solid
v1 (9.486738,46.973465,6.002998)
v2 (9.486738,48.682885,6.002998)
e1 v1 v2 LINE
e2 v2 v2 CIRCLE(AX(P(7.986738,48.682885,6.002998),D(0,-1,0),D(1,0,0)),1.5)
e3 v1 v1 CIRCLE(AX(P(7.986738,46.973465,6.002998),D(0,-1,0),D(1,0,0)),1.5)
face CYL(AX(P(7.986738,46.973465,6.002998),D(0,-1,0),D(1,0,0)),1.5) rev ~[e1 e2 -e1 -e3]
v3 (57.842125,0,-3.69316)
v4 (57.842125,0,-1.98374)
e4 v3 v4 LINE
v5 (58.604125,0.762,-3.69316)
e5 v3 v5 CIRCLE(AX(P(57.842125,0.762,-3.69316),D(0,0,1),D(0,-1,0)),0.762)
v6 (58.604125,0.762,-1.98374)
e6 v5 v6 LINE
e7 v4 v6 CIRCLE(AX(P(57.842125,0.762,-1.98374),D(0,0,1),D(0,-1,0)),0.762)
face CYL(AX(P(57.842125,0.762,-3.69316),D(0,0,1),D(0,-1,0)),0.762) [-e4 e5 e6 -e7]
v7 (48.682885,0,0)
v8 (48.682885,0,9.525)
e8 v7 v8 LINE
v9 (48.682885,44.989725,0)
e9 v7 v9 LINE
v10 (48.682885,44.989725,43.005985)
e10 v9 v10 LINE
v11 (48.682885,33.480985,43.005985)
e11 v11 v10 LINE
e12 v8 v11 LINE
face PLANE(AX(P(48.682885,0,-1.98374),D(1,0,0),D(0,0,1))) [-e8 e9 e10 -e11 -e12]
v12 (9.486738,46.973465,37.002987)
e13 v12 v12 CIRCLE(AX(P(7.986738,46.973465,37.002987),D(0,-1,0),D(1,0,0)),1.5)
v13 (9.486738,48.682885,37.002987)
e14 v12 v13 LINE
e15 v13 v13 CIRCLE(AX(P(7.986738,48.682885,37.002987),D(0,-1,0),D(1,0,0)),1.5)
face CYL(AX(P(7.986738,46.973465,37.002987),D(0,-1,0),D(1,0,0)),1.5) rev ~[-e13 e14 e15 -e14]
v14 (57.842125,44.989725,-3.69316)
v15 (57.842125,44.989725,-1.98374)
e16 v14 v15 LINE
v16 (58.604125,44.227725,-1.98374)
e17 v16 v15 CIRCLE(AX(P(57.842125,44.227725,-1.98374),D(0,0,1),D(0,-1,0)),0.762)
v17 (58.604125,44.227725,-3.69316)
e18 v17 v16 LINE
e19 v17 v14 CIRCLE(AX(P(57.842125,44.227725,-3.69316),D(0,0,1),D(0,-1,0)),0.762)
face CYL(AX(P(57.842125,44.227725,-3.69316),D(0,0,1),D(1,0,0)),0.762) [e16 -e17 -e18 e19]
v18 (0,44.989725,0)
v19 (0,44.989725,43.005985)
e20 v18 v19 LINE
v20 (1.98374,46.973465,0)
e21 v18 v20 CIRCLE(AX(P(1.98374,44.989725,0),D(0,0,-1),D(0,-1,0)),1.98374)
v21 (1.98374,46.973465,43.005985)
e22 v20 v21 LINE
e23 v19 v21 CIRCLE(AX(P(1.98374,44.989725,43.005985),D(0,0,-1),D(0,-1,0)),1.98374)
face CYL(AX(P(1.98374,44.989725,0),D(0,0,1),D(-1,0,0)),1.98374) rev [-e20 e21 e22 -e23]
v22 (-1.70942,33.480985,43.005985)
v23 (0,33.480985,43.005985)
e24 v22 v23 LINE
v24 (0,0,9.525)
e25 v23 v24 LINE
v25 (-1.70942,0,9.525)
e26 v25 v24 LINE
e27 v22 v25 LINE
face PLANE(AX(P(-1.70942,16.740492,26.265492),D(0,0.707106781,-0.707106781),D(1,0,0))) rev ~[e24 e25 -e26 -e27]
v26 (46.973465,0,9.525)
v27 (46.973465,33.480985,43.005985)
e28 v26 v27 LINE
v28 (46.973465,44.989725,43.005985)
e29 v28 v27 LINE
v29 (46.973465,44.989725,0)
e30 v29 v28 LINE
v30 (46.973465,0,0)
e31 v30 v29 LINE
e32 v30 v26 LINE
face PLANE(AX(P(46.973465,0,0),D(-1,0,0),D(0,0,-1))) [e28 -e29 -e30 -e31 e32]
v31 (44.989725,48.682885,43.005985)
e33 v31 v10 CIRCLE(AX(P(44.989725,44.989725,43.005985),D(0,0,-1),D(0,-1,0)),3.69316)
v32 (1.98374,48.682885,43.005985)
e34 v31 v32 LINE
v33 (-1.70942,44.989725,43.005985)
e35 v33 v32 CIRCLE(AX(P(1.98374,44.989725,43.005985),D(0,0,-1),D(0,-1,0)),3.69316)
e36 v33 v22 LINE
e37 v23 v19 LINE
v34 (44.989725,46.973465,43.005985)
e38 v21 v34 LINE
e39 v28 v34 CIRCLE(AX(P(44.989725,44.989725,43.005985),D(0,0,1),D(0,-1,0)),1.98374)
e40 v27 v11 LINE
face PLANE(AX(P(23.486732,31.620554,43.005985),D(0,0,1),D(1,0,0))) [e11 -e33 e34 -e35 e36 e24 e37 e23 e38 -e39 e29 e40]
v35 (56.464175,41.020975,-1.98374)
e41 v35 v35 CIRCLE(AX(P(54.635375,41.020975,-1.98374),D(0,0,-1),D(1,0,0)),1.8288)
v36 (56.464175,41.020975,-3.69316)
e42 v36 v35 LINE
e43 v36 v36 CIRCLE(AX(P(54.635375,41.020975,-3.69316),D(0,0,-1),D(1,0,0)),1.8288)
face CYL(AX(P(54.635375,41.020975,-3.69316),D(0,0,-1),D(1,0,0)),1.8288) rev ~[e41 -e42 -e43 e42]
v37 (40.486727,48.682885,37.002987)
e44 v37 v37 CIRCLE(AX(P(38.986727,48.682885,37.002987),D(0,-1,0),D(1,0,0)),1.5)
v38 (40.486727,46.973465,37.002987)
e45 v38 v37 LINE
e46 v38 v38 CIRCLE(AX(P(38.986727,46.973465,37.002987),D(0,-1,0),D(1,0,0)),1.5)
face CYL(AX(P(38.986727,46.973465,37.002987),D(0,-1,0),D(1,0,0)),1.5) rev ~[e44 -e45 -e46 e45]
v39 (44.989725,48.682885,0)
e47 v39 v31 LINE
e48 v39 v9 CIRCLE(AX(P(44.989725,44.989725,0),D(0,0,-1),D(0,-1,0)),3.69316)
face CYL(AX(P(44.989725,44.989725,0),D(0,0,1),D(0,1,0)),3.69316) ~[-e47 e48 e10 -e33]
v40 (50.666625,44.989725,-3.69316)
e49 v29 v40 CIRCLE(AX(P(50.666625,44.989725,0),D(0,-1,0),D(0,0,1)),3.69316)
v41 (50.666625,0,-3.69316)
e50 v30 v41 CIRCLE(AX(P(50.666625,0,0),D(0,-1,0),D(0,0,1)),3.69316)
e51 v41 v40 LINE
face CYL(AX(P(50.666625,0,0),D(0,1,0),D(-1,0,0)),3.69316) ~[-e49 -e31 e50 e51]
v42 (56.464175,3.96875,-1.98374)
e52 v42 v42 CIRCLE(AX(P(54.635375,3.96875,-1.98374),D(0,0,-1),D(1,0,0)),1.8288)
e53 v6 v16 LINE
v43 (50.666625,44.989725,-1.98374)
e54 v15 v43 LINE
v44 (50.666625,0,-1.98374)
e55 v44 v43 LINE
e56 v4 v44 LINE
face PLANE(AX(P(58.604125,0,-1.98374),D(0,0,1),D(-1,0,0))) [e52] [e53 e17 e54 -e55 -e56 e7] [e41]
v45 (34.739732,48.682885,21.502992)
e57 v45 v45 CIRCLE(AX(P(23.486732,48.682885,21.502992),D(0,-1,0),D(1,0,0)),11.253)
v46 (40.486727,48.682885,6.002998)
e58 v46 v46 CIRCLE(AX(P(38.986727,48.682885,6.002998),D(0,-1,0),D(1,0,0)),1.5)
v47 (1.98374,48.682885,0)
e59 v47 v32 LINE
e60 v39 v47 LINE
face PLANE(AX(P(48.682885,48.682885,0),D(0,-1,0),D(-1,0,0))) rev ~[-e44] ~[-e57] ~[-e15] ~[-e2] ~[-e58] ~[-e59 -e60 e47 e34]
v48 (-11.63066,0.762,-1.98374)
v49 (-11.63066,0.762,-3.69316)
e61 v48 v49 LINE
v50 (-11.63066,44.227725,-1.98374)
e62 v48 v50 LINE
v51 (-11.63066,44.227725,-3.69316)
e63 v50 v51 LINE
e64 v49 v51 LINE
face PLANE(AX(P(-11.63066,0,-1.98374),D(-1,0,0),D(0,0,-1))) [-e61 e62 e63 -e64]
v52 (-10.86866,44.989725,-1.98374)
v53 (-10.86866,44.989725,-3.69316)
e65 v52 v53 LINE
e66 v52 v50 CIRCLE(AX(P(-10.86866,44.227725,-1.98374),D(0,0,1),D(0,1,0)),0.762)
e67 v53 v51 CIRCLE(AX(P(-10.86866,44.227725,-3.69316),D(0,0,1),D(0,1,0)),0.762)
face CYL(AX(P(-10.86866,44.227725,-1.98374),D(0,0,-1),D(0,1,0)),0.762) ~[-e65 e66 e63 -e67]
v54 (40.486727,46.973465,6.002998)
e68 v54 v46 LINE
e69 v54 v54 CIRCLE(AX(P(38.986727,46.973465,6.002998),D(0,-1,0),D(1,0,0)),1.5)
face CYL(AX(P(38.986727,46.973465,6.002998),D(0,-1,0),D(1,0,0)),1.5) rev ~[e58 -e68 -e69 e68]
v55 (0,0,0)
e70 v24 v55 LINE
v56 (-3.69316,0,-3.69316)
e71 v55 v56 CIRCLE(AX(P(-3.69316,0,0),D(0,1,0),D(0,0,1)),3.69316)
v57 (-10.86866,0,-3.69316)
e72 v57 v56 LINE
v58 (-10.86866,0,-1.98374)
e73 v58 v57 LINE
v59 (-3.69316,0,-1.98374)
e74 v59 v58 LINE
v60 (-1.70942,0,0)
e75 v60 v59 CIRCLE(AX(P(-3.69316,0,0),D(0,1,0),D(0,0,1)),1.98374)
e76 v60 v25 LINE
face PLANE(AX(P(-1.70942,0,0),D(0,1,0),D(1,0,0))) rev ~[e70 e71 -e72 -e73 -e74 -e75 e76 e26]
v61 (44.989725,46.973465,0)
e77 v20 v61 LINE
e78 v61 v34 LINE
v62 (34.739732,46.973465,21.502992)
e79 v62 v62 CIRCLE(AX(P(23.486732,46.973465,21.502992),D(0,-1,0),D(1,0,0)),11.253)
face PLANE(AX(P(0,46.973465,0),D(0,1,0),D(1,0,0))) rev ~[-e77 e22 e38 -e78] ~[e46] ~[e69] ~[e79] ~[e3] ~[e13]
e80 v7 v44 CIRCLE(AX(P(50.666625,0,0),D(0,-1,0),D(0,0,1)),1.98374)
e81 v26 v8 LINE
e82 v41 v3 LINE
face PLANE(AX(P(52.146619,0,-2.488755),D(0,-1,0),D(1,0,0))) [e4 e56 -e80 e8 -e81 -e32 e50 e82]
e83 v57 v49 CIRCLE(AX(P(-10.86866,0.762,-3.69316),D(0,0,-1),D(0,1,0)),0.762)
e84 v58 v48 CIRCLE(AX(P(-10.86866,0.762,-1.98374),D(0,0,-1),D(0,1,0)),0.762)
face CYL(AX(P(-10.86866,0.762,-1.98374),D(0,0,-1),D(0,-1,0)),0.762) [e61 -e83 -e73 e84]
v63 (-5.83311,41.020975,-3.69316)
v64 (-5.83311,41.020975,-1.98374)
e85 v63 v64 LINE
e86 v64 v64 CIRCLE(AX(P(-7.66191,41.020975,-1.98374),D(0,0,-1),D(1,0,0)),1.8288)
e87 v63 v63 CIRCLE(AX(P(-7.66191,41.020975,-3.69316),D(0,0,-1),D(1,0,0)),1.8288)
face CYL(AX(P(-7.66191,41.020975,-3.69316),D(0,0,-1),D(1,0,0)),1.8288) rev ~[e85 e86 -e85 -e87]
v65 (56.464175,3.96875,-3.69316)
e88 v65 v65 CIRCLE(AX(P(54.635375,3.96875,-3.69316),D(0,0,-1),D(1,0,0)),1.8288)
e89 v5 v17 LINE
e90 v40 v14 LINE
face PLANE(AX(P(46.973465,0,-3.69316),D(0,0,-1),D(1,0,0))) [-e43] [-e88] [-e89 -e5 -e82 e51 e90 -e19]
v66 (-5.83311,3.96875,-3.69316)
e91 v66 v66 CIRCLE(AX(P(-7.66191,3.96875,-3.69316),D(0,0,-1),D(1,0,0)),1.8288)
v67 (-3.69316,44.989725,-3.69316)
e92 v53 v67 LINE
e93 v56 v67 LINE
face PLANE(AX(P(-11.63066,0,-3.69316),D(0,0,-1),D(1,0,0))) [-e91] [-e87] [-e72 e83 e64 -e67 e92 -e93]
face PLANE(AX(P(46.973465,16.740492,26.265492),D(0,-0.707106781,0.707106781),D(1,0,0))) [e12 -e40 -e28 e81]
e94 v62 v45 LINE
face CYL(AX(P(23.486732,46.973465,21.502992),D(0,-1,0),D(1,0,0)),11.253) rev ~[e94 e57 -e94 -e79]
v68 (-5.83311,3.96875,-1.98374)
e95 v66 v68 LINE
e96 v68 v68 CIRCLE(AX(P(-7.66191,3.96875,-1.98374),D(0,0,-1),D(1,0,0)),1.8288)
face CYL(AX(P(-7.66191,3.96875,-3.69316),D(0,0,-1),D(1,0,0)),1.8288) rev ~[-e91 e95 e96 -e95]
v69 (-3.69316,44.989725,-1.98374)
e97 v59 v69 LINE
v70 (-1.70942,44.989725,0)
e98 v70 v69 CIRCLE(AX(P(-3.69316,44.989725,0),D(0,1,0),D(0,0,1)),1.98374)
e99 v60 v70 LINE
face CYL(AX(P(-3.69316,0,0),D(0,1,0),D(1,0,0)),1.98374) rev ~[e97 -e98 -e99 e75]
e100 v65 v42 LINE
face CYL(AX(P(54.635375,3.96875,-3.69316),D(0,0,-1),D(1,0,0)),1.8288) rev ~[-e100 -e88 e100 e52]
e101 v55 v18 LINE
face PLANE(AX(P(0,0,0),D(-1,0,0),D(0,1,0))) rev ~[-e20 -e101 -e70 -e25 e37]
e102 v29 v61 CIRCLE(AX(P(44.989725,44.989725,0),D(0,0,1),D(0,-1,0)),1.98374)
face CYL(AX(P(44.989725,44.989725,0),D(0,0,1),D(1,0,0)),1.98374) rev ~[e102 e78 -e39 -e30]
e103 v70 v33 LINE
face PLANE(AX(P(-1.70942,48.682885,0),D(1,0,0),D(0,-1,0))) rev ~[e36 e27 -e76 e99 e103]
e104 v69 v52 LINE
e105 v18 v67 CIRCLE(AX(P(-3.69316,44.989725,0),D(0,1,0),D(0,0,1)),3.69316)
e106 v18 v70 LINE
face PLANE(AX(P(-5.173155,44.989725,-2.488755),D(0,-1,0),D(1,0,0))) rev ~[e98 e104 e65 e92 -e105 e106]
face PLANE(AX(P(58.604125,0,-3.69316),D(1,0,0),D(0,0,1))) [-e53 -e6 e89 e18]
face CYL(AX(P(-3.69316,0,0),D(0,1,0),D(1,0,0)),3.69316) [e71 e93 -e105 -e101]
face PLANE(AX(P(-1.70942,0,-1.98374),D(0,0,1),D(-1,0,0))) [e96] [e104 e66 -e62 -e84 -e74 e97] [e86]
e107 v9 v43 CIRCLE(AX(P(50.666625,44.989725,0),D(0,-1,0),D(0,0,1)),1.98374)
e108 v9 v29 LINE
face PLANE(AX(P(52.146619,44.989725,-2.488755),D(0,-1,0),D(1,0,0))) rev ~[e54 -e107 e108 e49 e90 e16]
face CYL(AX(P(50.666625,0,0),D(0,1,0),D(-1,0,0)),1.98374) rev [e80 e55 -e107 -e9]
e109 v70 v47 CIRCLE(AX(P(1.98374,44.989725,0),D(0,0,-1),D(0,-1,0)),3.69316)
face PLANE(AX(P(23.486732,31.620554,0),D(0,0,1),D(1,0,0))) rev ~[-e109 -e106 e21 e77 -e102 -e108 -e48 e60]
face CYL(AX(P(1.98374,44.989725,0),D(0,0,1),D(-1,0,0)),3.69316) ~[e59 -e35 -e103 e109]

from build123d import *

# Parameters (mm, degrees)
F1_DEPTH  = 43.0059846
F4_DEPTH  = 44.9897246
F5_R      = 1.98374
F6_R      = 3.69316
F7_SIZE   = 33.4809846
F8_R      = 11.2530001
F8_R_2    = 1.5
F9_DEPTH  = 1.70942
F10_R     = 1.8288
F11_DEPTH = 1.70942
F12_R     = 0.762


with BuildPart() as f1:
    # F0 (on Top) → F1 (new body)
    with BuildSketch(Plane.XY):
        Polygon((-1.70942, 0), (0, 0), (0, 46.9734646), (46.9734646, 46.9734646), (46.9734646, 0), (48.6828846, 0), (48.6828846, 48.6828846), (-1.70942, 48.6828846), align=None)
    extrude(amount=F1_DEPTH)

    # F3 (on face) → F4 (join, through all)
    with BuildSketch(Plane.XZ):
        Polygon((48.6828846, 0), (46.9734646, 0), (46.9734646, -3.69316), (58.6041246, -3.69316), (58.6041246, -1.98374), (48.6828846, -1.98374), align=None)
        Polygon((0, 0), (-1.70942, 0), (-1.70942, -1.98374), (-11.63066, -1.98374), (-11.63066, -3.69316), (0, -3.69316), align=None)
    extrude(amount=-F4_DEPTH)

    # F5
    f5_edges = [f1.edges().sort_by_distance(p)[0] for p in [
        (0, 46.973465, 21.502992),
        (46.973465, 46.973465, 21.502992),
        (-1.70942, 22.494862, -1.98374),
        (48.682885, 22.494862, -1.98374),
    ]]
    fillet(f5_edges, radius=F5_R)

    # F6
    f6_edges = [f1.edges().sort_by_distance(p)[0] for p in [
        (48.682885, 48.682885, 21.502992),
        (-1.70942, 48.682885, 21.502992),
        (0, 22.494862, -3.69316),
        (46.973465, 22.494862, -3.69316),
    ]]
    fillet(f6_edges, radius=F6_R)

    # F7
    f7_edges = [f1.edges().sort_by_distance(p)[0] for p in [
        (-0.85471, 0, 43.005985),
        (47.828175, 0, 43.005985),
    ]]
    chamfer(f7_edges, length=F7_SIZE)

    # F8 (on face) → F9 (cut, through all)
    with BuildSketch(Plane.XZ.offset(-46.9734646)):
        with Locations((23.4867323, 21.5029923)):
            Circle(F8_R)
        with Locations((38.9867267, 37.0029867)):
            Circle(F8_R_2)
        with Locations((38.9867267, 6.0029979)):
            Circle(F8_R_2)
        with Locations((7.9867379, 6.0029979)):
            Circle(F8_R_2)
        with Locations((7.9867379, 37.0029867)):
            Circle(F8_R_2)
    extrude(amount=-F9_DEPTH, mode=Mode.SUBTRACT)

    # F10 (on face) → F11 (cut, through all)
    with BuildSketch(Plane(origin=(0, 0, -3.69316), x_dir=(1, 0, 0), z_dir=(0, 0, -1))):
        with Locations((54.6353746, -41.0209746001)):
            Circle(F10_R)
        with Locations((-7.66191, -41.0209746001)):
            Circle(F10_R)
        with Locations((-7.66191, -3.9687499999)):
            Circle(F10_R)
        with Locations((54.6353746, -3.9687499999)):
            Circle(F10_R)
    extrude(amount=-F11_DEPTH, mode=Mode.SUBTRACT)

    # F12
    f12_edges = [f1.edges().sort_by_distance(p)[0] for p in [
        (58.604125, 0, -2.83845),
        (-11.63066, 0, -2.83845),
        (-11.63066, 44.989725, -2.83845),
        (58.604125, 44.989725, -2.83845),
    ]]
    fillet(f12_edges, radius=F12_R)


solid = f1.part
